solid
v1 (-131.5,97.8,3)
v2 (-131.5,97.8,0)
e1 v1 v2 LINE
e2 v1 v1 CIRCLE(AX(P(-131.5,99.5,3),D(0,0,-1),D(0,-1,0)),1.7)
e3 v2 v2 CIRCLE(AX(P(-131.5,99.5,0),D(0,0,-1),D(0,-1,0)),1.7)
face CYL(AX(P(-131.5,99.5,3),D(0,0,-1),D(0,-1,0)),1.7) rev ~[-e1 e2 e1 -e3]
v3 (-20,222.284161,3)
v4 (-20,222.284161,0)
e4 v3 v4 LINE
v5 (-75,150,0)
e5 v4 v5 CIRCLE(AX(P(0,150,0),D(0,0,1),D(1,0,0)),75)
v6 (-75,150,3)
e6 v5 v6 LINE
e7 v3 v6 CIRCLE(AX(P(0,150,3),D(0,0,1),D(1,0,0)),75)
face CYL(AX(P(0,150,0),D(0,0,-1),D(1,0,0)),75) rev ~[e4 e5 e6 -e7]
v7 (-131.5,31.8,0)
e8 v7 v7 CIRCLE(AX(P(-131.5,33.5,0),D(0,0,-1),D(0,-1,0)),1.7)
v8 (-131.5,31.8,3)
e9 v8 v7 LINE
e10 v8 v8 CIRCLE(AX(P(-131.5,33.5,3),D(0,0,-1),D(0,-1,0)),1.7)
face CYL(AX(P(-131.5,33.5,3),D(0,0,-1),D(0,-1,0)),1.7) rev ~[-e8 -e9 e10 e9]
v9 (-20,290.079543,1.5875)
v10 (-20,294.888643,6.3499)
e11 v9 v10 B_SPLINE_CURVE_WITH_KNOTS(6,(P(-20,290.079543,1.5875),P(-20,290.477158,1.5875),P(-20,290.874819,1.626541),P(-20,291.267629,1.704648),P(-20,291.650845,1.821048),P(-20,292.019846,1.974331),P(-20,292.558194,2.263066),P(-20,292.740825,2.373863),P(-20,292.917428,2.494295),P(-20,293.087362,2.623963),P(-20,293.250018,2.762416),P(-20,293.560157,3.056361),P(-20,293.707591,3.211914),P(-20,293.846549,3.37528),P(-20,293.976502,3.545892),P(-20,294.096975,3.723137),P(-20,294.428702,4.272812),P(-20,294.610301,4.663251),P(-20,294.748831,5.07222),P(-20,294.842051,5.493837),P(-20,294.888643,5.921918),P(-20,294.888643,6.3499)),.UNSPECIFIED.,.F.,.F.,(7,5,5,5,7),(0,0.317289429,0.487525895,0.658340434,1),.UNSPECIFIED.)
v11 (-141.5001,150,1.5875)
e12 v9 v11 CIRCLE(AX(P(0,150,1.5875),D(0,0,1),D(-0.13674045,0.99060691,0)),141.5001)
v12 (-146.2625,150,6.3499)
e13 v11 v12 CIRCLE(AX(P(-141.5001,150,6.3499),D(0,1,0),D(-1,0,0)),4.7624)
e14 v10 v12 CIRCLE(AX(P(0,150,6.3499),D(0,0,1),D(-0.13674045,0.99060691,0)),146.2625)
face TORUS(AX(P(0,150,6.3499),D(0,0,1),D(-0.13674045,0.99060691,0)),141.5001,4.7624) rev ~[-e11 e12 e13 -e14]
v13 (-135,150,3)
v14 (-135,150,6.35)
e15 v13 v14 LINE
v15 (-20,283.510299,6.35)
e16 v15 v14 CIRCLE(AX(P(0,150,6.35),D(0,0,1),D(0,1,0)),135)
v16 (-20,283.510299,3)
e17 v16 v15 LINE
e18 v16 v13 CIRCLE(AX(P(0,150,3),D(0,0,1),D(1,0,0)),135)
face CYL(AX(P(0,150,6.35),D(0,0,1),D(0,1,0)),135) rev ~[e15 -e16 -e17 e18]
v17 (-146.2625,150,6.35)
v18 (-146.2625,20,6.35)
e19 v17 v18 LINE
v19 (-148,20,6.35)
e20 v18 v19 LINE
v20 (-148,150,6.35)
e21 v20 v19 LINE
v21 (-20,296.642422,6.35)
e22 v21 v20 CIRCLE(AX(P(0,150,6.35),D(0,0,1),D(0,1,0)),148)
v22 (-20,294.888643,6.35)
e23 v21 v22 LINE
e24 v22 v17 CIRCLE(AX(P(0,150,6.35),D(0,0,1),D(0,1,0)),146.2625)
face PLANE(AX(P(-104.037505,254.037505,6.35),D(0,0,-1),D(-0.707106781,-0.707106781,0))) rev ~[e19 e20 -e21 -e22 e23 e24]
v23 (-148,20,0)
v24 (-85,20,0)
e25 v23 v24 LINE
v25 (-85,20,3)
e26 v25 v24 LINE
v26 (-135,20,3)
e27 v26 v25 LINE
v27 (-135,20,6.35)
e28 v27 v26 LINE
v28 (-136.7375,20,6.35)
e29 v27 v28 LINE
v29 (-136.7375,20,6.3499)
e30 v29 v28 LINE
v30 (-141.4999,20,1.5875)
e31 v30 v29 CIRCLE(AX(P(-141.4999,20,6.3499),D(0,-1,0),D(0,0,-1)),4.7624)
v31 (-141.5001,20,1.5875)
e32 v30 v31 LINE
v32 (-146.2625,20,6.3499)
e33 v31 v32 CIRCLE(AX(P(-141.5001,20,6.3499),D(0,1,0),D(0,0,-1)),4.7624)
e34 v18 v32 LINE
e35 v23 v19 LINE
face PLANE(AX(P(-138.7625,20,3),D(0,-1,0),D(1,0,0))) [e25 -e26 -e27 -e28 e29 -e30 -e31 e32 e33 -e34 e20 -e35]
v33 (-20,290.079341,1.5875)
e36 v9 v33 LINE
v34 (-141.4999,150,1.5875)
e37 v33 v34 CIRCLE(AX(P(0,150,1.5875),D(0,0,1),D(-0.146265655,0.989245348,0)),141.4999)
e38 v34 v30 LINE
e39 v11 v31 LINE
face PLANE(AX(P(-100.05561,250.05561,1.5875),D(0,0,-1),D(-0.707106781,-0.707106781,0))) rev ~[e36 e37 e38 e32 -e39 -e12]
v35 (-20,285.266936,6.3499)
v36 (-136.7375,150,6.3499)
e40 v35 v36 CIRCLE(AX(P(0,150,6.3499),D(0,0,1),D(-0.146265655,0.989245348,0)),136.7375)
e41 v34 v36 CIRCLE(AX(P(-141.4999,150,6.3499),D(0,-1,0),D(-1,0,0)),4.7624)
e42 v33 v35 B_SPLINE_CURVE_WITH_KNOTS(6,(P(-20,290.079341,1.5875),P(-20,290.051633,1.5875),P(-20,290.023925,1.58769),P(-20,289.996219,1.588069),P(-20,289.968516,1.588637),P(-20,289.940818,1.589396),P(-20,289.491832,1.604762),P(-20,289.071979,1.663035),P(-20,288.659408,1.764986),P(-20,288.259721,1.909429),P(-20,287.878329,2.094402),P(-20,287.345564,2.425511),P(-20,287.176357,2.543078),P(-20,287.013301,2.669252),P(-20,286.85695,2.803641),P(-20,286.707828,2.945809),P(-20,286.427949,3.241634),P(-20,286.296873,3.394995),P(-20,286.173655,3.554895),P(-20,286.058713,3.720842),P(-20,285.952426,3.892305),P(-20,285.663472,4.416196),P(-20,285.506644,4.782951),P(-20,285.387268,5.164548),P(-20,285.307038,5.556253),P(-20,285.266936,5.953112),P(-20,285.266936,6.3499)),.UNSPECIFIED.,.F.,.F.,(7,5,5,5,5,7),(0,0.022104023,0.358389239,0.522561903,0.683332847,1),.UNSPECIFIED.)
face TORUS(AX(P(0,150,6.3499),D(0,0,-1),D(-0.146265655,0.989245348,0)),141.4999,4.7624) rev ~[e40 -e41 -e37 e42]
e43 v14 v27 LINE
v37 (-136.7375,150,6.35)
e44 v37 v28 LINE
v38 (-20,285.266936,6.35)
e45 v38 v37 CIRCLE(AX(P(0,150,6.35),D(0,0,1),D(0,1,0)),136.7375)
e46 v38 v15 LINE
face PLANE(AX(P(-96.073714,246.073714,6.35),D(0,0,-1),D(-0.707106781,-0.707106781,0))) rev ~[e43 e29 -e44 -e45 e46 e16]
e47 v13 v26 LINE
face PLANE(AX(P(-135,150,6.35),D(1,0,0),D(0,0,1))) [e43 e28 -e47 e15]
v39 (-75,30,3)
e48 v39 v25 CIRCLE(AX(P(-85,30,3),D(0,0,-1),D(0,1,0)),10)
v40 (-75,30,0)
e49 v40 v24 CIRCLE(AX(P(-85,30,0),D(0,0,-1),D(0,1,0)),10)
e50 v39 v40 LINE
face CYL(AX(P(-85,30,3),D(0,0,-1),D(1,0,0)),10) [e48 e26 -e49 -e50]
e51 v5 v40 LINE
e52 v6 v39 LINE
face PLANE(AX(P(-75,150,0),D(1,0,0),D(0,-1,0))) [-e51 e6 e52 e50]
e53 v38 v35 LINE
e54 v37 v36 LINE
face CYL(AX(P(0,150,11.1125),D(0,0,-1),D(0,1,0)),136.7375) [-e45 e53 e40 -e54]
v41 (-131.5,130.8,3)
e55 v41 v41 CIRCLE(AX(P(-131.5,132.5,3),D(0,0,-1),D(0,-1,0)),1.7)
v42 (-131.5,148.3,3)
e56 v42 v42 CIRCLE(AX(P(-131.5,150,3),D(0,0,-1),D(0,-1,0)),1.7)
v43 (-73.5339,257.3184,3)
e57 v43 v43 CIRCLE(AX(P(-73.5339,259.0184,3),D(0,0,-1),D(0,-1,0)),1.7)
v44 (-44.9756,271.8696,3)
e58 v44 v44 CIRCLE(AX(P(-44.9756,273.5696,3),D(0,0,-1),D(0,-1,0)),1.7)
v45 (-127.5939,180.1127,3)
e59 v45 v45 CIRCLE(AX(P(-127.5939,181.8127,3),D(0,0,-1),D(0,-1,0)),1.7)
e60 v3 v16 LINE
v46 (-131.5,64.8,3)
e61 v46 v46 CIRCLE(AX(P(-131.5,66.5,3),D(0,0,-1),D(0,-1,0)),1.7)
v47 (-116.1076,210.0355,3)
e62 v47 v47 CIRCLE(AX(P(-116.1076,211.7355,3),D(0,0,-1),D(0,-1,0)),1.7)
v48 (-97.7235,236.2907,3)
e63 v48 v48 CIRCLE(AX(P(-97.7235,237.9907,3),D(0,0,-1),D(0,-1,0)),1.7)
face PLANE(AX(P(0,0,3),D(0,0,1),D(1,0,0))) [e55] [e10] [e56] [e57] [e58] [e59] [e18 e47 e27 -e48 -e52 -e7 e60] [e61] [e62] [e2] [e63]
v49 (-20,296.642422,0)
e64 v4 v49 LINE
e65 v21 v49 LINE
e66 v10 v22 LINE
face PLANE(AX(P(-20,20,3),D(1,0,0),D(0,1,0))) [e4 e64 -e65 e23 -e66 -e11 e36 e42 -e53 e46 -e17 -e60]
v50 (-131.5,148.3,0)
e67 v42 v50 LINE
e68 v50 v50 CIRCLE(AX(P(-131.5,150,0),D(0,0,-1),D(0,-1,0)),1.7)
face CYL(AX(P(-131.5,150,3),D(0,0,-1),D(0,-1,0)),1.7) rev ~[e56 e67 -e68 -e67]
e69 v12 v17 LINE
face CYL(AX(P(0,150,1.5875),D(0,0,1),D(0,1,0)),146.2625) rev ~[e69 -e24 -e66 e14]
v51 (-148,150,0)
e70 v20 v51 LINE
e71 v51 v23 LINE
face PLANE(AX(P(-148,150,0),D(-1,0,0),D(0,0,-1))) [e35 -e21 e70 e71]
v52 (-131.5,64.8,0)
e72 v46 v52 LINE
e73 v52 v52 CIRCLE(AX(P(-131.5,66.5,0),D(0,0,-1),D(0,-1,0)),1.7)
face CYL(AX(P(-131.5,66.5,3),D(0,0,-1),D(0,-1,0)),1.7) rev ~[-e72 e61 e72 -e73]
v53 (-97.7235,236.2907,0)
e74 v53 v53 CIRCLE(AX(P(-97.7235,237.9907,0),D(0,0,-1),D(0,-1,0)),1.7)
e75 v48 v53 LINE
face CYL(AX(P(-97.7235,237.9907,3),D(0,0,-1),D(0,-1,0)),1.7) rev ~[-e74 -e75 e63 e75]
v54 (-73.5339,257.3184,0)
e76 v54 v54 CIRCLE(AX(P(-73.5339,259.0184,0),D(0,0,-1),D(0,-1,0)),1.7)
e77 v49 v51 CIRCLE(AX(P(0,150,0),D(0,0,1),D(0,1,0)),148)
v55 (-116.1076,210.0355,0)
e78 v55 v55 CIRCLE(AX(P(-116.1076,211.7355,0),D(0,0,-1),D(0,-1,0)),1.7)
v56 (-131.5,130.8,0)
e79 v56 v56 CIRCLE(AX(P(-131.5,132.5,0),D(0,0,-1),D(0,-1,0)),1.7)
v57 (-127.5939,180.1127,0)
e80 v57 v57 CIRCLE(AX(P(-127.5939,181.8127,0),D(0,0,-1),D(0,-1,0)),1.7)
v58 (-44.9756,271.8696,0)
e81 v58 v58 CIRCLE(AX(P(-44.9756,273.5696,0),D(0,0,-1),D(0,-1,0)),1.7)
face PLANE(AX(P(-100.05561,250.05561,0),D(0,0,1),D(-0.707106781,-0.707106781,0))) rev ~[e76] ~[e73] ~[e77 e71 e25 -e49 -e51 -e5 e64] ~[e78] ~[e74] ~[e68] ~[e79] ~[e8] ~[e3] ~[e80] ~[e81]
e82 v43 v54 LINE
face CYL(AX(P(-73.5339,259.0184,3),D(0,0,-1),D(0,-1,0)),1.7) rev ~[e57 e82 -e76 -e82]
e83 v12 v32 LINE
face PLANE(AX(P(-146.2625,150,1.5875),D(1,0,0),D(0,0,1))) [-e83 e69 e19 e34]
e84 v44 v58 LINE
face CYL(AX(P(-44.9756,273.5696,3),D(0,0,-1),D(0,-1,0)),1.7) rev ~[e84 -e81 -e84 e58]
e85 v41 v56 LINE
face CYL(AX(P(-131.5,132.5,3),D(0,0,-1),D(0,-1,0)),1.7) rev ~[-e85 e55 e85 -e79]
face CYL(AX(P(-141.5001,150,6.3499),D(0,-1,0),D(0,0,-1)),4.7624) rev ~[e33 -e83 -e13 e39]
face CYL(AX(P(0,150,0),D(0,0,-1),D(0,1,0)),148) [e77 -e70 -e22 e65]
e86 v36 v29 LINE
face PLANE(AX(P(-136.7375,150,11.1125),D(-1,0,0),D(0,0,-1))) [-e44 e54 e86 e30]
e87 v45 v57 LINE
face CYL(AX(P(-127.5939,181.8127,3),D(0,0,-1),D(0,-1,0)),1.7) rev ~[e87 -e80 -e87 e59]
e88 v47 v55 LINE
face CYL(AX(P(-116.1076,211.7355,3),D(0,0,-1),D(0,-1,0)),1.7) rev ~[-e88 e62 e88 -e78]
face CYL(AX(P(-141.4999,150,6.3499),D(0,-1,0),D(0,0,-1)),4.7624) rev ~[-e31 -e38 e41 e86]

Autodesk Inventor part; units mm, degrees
ref_plane "YZ Plane" through (0, 0, 0) normal (1, 0, 0) x (0, 1, 0)
ref_plane "XZ Plane" through (0, 0, 0) normal (0, 1, 0) x (-1, 0, 0)
ref_plane "Work Plane1" through (0, 0, 0) normal (0, 0, 1) x (1, 0, 0)
sketch "Sketch1" plane through (0, 0, 0) normal (0, 0, 1) x (1, 0, 0)
  line L0 (-135, 150) -> (-135, -150)
  arc A0 (-135, -150) -> (135, -150) centre (0, -150) ccw
  line L1 (135, -150) -> (135, 150)
  arc A1 (135, 150) -> (-135, 150) centre (0, 150) ccw
  line L2 (-80, -150) -> (-80, 150)
  arc A2 (80, 150) -> (-80, 150) centre (0, 150) ccw
  line L3 (80, 150) -> (80, -150)
  arc A3 (-80, -150) -> (80, -150) centre (0, -150) ccw
  line L4 (0, 0) -> (-135, 0)
  line L5 (0, 0) -> (0, 285)
  line L6 (-75, 150) -> (-75, -150)
  arc A4 (-75, -150) -> (75, -150) centre (0, -150) ccw
  line L7 (75, -150) -> (75, 150)
  arc A5 (75, 150) -> (-75, 150) centre (0, 150) ccw
  point P0 (0, 230)
  point P1 (-80, 0)
  point P2 (0, 225)
  point P3 (-75, 0)
  point P4 (135, 0)
  point P5 (-75, 0)
  point P6 (0, -230)
  dimension "d18" = 5
  dimension "d34" = 300
  dimension "d37" = 55
  dimension "d38" = 75
  dimension "d39" = 75
extrude "Extrusion1" add sketch "Sketch1" along normal blind 3 contours A1 L5 A2 L2 L4 L0 | L2 A2 L5 A5 L6 L4
sketch "Sketch2" plane through (0, 0, 3) normal (0, 0, 1) x (1, 0, 0)
  arc A0 (0, 285) -> (-135, 150) centre (0, 150) ccw projected
  line L0 (-135, 150) -> (-135, 0) projected
  line L1 (-135, 0) -> (-75, 0) construction
  line L2 (0, 225) -> (0, 285) construction
  line L3 (-75, 0) -> (-75, 150) projected
  arc A1 (0, 225) -> (-75, 150) centre (0, 150) ccw projected
  point P0 (0, 0)
sketch "Sketch3" plane through (-135, 0, 0) normal (0, -1, 0) x (1, 0, 0)
  line L0 (0, 0) -> (-13, 0)
  line L1 (-13, 0) -> (-13, 6.35)
  line L2 (-13, 6.35) -> (0, 6.35)
  line L3 (0, 6.35) -> (0, 0)
  circle A0 centre (-6.5, 6.35) radius 4.7625 construction
  line L4 (-11.2625, 11.1125) -> (-1.7375, 11.1125)
  line L5 (-1.7375, 11.1125) -> (-1.7375, 1.5875)
  line L6 (-1.7375, 1.5875) -> (-11.2625, 1.5875)
  line L7 (-11.2625, 1.5875) -> (-11.2625, 11.1125)
  line L8 (-11.2625, 11.1125) -> (-1.7375, 1.5875) construction
  line L9 (-1.7375, 11.1125) -> (-11.2625, 1.5875) construction
  point P0 (135, 0)
  point P1 (-1.7375, 6.35)
  point P2 (-11.2625, 6.35)
  point P3 (-1.7375, 6.35)
  point P4 (-11.2625, 6.35)
  dimension "d2" = 13
  dimension "d3" = 6.35
  dimension "d4" = 9.525
  dimension "d5" = 0
sweep "Sweep1" add profiles "Sketch3" path "Sketch2" path curves L0 A0 contours L0 L1 L2 L7 L6 L5 L3
sketch "Sketch6" plane through (-75, 0, 0) normal (0, -1, 0) x (1, 0, 0)
  arc A0 (-63.7625, 6.35) -> (-54.2375, 6.35) centre (-59, 6.35) ccw projected
  circle A1 centre (-59, 6.35) radius 4.7625
  circle A2 centre (-59, 6.35) radius 3.175
  point P0 (75, 0)
  point P1 (-54.2375, 6.35)
  dimension "d14" = 9.525
  dimension "d15" = 6.35
sketch3d "3D Sketch1"
sweep "Sweep2" [suppressed]
sketch "Sketch4" plane through (0, 0, 3) normal (0, 0, 1) x (1, 0, 0)
  line L0 (0, 0) -> (-148.7625, 0)
  line L1 (-148.7625, 0) -> (-148.7625, 20)
  line L2 (-148.7625, 20) -> (0, 20)
  line L3 (0, 20) -> (0, 0)
  line L4 (0, 0) -> (-20, 0)
  line L5 (-20, 0) -> (-20, 308)
  line L6 (-20, 308) -> (0, 308)
  line L7 (0, 308) -> (0, 0)
  line L8 (-138.7625, 0) -> (-138.7625, 300) projected
  point P0 (0, 298)
  point P1 (-20, 20)
  point P2 (-138.7625, 20)
  dimension "d8" = 20
  dimension "d9" = 20
  dimension "d10" = 10
  dimension "d11" = 10
extrude "Extrusion2" cut sketch "Sketch4" against normal through all both and the other way through all contours L0 L8 L2 L5 | L2 L5 L6 L7 | L0 L1 L2 L8 bodies 1
sketch "Sketch7" plane through (0, 0, 3) normal (0, 0, 1) x (1, 0, 0)
  line L0 (-20, 222.2842) -> (-20, 283.5103) projected
  arc A0 (-20, 283.5103) -> (-135, 150) centre (0, 150) ccw projected
  line L1 (-135, 150) -> (-135, 0) projected
  line L2 (-135, 20) -> (-75, 20) projected
  line L3 (-75, 20) -> (-75, 150) projected
  arc A1 (-20, 222.2842) -> (-75, 150) centre (0, 150) ccw projected
  line L4 (-78.5, 150) -> (-78.5, 23.5)
  line L5 (-78.5, 23.5) -> (-131.5, 23.5)
  line L6 (-131.5, 23.5) -> (-131.5, 150)
  arc A2 (-23.5, 279.3832) -> (-131.5, 150) centre (0, 150) ccw
  line L7 (-23.5, 279.3832) -> (-23.5, 224.8999)
  arc A3 (-23.5, 224.8999) -> (-78.5, 150) centre (0, 150) ccw
  point P0 (0, 0)
  point P1 (-131.5, 33.5)
  point P2 (-127.5939, 181.8127)
  point P3 (-116.1076, 211.7355)
  point P4 (-97.7235, 237.9907)
  point P5 (-73.5339, 259.0184)
  point P6 (-44.9756, 273.5696)
  point P7 (-131.5, 66.5)
  point P8 (-131.5, 99.5)
  point P9 (-131.5, 132.5)
  dimension "d21" = 3.5
  dimension "d24" = 70
  dimension "d26" = 10
  dimension "d29" = 33
hole "Hole1" at (-131.5, 33.5, 3) at (-131.5, 150, 3) at (-127.5939, 181.8127, 3) at (-116.1076, 211.7355, 3) at (-97.7235, 237.9907, 3) at (-73.5339, 259.0184, 3) at (-44.9756, 273.5696, 3) at (-131.5, 66.5, 3) at (-131.5, 99.5, 3) at (-131.5, 132.5, 3) direction (0, 0, -1) diameter 3.4 end through all bodies 1
fillet "Fillet1" radius 10 1 edges at (-75, 20, 1.5)
sketch "Sketch8" plane through (0, 0, 3) normal (0, 0, 1) x (1, 0, 0)
  arc A0 (-85, 20) -> (-75, 30) centre (-85, 30) ccw projected
  line L0 (-75, 30) -> (-75, 150) projected
  arc A1 (-20, 222.2842) -> (-75, 150) centre (0, 150) ccw projected
  line L1 (-20, 222.2842) -> (-20, 283.5103) projected
  arc A2 (-20, 283.5103) -> (-135, 150) centre (0, 150) ccw projected
  line L2 (-135, 150) -> (-135, 20) projected
  line L3 (-135, 20) -> (-85, 20) projected
  line L4 (-74.9, 150) -> (-74.9, 30)
  arc A3 (-85, 19.9) -> (-74.9, 30) centre (-85, 30) ccw
  line L5 (-85, 19.9) -> (-135.1, 19.9)
  line L6 (-135.1, 19.9) -> (-135.1, 150)
  arc A4 (-19.9, 283.6263) -> (-135.1, 150) centre (0, 150) ccw
  line L7 (-19.9, 283.6263) -> (-19.9, 222.208)
  arc A5 (-19.9, 222.208) -> (-74.9, 150) centre (0, 150) ccw
  point P0 (0, 0)
  dimension "d48" = 0.1
extrude "Extrusion3" [suppressed]
sketch "Sketch11" plane through (0, 0, 3) normal (0, 0, 1) x (1, 0, 0)
  line L0 (-135, 150) -> (-135, 20) projected
  circle A0 centre (-131.5, 99.5) radius 1.7 projected
  circle A1 centre (-44.9756, 273.5696) radius 1.7 projected
  circle A2 centre (-97.7235, 237.9907) radius 1.7 projected
  circle A3 centre (-127.5939, 181.8127) radius 1.7 projected
  circle A4 centre (-131.5, 33.5) radius 1.7 projected
  circle A5 centre (-131.5, 150) radius 1.7 projected
  circle A6 centre (-116.1076, 211.7355) radius 1.7 projected
  circle A7 centre (-73.5339, 259.0184) radius 1.7 projected
  circle A8 centre (-131.5, 66.5) radius 1.7 projected
  circle A9 centre (-131.5, 132.5) radius 1.7 projected
  line L1 (-20, 277.0859) -> (-20, 222.2842)
  arc A10 (-20, 222.2842) -> (-75, 150) centre (0, 150) ccw projected
  arc A11 (-23, 224.5319) -> (-78, 150) centre (0, 150) ccw
  line L2 (-23, 224.5319) -> (-23, 276.5773)
  line L3 (-135, 20) -> (-85, 20) projected
  line L4 (-128.65, 20) -> (-85, 20)
  arc A12 (-85, 20) -> (-75, 30) centre (-85, 30) ccw projected
  arc A13 (-85, 23) -> (-78, 30) centre (-85, 30) ccw
  line L5 (-85, 23) -> (-131.0405, 23)
  line L6 (-78, 150) -> (-78, 30)
  arc A14 (-85, 20) -> (-75, 30) centre (-85, 30) ccw projected
  line L7 (-75, 30) -> (-75, 150) projected
  line L8 (-20, 222.2842) -> (-20, 283.5103) projected
  arc A15 (-20, 283.5103) -> (-135, 150) centre (0, 150) ccw projected
  point P0 (0, 0)
  dimension "d53" = 3
  dimension "d54" = 3
sketch "Sketch12" plane through (0, 0, 3) normal (0, 0, 1) x (1, 0, 0)
  arc A0 (-85, 20) -> (-75, 30) centre (-85, 30) ccw projected
  line L0 (-75, 30) -> (-75, 150) projected
  arc A1 (-20, 222.2842) -> (-75, 150) centre (0, 150) ccw projected
  line L1 (-20, 222.2842) -> (-20, 283.5103) projected
  arc A2 (-20, 283.5103) -> (-135, 150) centre (0, 150) ccw projected
  line L2 (-135, 150) -> (-135, 20) projected
  line L3 (-135, 20) -> (-85, 20) projected
  circle A3 centre (-131.5, 99.5) radius 1.7 projected
  circle A4 centre (-44.9756, 273.5696) radius 1.7 projected
  circle A5 centre (-97.7235, 237.9907) radius 1.7 projected
  circle A6 centre (-127.5939, 181.8127) radius 1.7 projected
  circle A7 centre (-131.5, 33.5) radius 1.7 projected
  circle A8 centre (-131.5, 150) radius 1.7 projected
  circle A9 centre (-116.1076, 211.7355) radius 1.7 projected
  circle A10 centre (-73.5339, 259.0184) radius 1.7 projected
  circle A11 centre (-131.5, 66.5) radius 1.7 projected
  circle A12 centre (-131.5, 132.5) radius 1.7 projected
  point P0 (0, 0)
  point P1 (-106.1535, 4.76)
  point P2 (-134.9295, 287.3233)
  dimension "d55" = 15.24
fillet "Fillet2" radius 4.7625 4 edges at (-110.2678, 246.0923, 1.5875) (-146.2625, 85, 1.5875) (-103.5179, 239.3375, 1.5875) (-136.7375, 85, 1.5875)
equation "\"d39\" = d38"
properties part number "1122_Middle Heat Sink_V1" material "Aluminum 6061"
